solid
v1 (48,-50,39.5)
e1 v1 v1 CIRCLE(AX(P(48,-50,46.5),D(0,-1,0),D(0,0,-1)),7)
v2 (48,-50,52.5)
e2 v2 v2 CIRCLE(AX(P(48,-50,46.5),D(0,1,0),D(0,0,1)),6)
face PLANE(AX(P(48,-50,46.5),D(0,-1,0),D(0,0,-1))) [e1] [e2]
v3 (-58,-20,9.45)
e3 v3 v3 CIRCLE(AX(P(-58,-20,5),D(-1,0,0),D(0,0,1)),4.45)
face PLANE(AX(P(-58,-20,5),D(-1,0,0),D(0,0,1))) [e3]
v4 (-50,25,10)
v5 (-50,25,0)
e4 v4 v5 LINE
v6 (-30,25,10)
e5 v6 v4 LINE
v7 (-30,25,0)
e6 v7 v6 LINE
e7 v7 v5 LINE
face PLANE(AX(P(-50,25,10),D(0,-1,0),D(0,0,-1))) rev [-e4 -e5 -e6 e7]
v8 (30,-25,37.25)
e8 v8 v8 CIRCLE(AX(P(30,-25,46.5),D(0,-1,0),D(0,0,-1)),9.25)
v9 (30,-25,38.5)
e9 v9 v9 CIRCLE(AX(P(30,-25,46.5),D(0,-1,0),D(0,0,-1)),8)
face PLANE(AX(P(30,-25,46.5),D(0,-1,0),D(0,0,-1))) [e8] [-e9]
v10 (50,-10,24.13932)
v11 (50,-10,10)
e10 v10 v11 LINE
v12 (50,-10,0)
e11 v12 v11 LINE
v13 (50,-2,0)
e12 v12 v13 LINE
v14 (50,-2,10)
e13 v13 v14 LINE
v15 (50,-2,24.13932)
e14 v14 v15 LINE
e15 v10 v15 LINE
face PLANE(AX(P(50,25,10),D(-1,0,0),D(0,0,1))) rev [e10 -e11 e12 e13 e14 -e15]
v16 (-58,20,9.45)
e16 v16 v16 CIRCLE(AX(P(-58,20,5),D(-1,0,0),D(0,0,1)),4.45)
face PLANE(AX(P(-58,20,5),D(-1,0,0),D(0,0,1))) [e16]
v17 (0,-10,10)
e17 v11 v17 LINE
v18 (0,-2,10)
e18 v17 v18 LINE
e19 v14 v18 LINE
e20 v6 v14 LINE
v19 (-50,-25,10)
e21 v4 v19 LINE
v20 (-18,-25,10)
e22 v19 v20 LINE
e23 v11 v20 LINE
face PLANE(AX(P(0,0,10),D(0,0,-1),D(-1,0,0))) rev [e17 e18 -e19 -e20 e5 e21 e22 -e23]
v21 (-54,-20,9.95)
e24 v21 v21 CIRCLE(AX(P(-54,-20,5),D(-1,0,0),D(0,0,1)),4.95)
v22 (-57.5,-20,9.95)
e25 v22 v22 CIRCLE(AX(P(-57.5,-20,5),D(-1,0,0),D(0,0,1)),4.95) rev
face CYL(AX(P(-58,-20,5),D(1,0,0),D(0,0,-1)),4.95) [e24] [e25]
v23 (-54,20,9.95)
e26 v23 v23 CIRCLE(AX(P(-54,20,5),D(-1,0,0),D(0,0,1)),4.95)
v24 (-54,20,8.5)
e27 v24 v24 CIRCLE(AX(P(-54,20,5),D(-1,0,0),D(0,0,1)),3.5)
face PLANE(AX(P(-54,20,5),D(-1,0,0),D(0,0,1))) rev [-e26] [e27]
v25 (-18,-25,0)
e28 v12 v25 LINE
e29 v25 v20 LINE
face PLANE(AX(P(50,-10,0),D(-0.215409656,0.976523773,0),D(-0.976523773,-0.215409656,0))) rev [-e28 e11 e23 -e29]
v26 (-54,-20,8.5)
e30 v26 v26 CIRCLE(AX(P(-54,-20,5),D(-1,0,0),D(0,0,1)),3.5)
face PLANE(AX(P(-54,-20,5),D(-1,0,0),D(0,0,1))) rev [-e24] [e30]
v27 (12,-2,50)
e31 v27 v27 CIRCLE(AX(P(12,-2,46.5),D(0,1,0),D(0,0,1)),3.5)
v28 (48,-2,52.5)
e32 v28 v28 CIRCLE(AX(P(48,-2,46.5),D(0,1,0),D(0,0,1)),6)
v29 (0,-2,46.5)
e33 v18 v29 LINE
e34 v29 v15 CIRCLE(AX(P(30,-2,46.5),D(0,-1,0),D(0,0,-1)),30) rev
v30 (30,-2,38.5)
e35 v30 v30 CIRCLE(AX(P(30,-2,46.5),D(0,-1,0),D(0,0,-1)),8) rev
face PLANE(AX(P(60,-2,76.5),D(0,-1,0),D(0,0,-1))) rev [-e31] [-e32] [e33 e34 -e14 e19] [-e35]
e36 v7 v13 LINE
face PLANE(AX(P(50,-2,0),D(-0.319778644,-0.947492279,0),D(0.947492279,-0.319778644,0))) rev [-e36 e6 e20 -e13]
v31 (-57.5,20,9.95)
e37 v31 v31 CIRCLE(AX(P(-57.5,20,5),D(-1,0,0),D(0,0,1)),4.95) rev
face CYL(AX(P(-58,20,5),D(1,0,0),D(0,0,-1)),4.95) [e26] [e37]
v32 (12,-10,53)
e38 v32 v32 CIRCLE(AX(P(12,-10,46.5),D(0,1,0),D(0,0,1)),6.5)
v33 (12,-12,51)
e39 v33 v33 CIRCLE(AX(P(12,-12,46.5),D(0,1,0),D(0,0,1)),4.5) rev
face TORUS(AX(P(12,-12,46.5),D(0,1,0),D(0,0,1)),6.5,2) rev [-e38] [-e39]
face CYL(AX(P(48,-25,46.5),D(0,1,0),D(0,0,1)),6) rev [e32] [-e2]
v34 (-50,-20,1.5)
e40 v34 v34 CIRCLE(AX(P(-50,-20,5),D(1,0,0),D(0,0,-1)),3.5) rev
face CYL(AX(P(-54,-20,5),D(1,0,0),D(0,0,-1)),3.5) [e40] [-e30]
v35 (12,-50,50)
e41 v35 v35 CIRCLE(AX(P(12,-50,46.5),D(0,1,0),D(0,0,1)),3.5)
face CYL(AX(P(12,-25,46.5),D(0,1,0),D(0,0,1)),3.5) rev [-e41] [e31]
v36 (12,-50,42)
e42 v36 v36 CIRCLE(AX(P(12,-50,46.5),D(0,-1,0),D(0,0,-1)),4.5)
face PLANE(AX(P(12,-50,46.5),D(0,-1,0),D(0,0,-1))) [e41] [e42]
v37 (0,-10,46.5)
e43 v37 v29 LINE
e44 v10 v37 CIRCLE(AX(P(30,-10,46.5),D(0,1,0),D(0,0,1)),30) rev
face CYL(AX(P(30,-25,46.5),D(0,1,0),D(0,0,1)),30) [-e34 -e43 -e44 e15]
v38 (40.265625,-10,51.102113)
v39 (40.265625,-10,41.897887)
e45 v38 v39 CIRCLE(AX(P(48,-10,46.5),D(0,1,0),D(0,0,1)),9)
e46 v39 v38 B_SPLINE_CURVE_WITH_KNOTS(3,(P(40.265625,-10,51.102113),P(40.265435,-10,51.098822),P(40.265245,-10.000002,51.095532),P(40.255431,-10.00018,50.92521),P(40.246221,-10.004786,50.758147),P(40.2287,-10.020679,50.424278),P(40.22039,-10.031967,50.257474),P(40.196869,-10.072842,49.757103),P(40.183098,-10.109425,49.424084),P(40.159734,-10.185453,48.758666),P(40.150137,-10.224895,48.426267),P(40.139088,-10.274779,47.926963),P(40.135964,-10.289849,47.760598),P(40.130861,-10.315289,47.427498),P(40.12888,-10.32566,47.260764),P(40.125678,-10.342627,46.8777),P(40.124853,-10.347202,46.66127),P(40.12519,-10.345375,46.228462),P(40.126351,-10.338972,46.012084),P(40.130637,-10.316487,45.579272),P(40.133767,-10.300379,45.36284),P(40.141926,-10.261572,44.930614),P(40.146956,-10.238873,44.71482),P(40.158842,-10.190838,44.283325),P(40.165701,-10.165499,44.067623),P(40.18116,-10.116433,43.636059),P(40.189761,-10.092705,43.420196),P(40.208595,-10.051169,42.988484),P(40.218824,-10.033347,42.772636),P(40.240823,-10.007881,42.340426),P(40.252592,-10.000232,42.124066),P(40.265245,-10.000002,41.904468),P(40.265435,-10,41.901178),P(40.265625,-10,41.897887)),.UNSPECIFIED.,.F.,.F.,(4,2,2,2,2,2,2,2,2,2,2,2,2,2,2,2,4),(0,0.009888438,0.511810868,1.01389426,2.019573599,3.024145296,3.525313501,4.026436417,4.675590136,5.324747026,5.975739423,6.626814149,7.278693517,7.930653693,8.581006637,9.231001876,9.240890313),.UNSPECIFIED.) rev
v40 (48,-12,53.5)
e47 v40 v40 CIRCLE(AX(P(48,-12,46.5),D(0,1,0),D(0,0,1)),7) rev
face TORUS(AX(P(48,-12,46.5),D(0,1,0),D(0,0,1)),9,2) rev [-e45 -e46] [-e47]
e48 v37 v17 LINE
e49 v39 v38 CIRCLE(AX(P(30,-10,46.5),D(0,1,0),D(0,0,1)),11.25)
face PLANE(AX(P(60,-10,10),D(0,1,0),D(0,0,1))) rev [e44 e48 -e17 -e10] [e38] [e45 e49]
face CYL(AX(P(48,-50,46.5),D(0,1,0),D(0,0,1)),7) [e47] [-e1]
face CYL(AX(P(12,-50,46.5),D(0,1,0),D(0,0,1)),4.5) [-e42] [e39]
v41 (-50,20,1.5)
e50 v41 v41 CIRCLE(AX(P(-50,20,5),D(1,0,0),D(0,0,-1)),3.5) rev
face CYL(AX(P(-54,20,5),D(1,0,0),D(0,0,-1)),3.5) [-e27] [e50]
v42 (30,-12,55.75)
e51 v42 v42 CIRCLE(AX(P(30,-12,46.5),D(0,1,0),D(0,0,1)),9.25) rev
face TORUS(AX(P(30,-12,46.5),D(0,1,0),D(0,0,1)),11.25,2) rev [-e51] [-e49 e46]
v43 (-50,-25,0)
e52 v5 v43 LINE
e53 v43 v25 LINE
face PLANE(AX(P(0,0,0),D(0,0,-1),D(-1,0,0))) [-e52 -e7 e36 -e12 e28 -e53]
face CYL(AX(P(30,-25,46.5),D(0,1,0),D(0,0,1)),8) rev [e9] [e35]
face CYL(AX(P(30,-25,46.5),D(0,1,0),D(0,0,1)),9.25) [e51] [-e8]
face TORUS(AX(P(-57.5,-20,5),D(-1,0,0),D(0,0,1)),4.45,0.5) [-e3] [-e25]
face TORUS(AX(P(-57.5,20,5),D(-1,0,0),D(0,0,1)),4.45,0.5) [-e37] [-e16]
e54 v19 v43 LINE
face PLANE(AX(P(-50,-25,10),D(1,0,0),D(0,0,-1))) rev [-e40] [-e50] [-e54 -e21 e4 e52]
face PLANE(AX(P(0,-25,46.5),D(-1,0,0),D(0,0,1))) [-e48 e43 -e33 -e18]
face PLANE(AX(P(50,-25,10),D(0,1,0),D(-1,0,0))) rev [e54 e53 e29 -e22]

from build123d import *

# Parameters (mm, degrees)
SKETCH3_W               = 100
SKETCH3_H               = 50
BOSS_EXTRUDE1_DEPTH     = 10
SKETCH4_R               = 3.5
BOSS_EXTRUDE2_DEPTH     = 4
SKETCH5_R               = 4.95
BOSS_EXTRUDE3_DEPTH     = 4
BOSS_EXTRUDE4_DEPTH     = 50
CUT_EXTRUDE1_DEPTH      = 110.326346321
CUT_EXTRUDE1_DEPTH_BACK = 110.326346321
SKETCH7_R               = 8
CUT_EXTRUDE2_DEPTH      = 101.385506922
CUT_EXTRUDE2_DEPTH_BACK = 101.385506922
SKETCH10_W              = 66.5
SKETCH10_H              = 27
CUT_EXTRUDE3_DEPTH      = 93.990590922
SKETCH12_W              = 66.5
SKETCH12_H              = 15
CUT_EXTRUDE4_DEPTH      = 101.385506922
CUT_EXTRUDE5_DEPTH      = 93.990590922
SKETCH15_R              = 3.5
SKETCH15_R_2            = 6
CUT_EXTRUDE6_DEPTH      = 101.902180353
SKETCH16_R              = 4.5
SKETCH16_R_2            = 7
BOSS_EXTRUDE5_DEPTH     = 40
SKETCH17_R              = 6
SKETCH17_R_2            = 3.5
CUT_EXTRUDE7_DEPTH      = 106.129681822
SKETCH18_R              = 9.25
BOSS_EXTRUDE6_DEPTH     = 15
SKETCH19_R              = 8
CUT_EXTRUDE8_DEPTH      = 110.326346321
FILLET3_R               = 2
FILLET4_R               = 0.5


with BuildPart() as part:
    # Sketch3 → Boss-Extrude1 (new body)
    with BuildSketch(Plane.XY):
        Rectangle(SKETCH3_W, SKETCH3_H)
    extrude(amount=BOSS_EXTRUDE1_DEPTH)

    # Sketch4 → Boss-Extrude2 (add)
    with BuildSketch(Plane.ZY.offset(50)):
        with Locations(Location((5, 20, 0), (0, 0, 180))):
            Circle(SKETCH4_R)
        with Locations(Location((5, -20, 0), (0, 0, 180))):
            Circle(SKETCH4_R)
    extrude(amount=BOSS_EXTRUDE2_DEPTH)

    # Sketch5 → Boss-Extrude3 (add)
    with BuildSketch(Plane.ZY.offset(54)):
        with Locations((5, 20)):
            Circle(SKETCH5_R)
        with Locations((5, -20)):
            Circle(SKETCH5_R)
    extrude(amount=BOSS_EXTRUDE3_DEPTH)

    # Sketch6 → Boss-Extrude4 (add)
    with BuildSketch(Plane(origin=(0, 25, 0), x_dir=(1, 0, 0), z_dir=(0, 1, 0))):
        with BuildLine():
            Line((0, -46.5), (0, -10))
            Line((0, -10), (50, -10))
            Line((50, -10), (50, -24.139320225))
            ThreePointArc((50, -24.139320225), (42.247448714, -73.886127875), (0, -46.5))
        make_face()
    extrude(amount=-BOSS_EXTRUDE4_DEPTH)

    # Sketch7 → Cut-Extrude1 (cut, two sides: drawn at the far end of the back side and taken through both)
    with BuildSketch(Plane(origin=(0, 25, 0), x_dir=(1, 0, 0), z_dir=(0, 1, 0)).offset(-CUT_EXTRUDE1_DEPTH_BACK)):
        with Locations(Location((30, -46.5, 0), (0, 0, 270))):
            Circle(SKETCH7_R)
    extrude(amount=CUT_EXTRUDE1_DEPTH + CUT_EXTRUDE1_DEPTH_BACK, mode=Mode.SUBTRACT)

    # Sketch10 → Cut-Extrude2 (cut, two sides: drawn at the far end of the back side and taken through both)
    with BuildSketch(Plane.ZY.offset(-CUT_EXTRUDE2_DEPTH_BACK)):
        with Locations((43.25, 11.5)):
            Rectangle(SKETCH10_W, SKETCH10_H)
    extrude(amount=CUT_EXTRUDE2_DEPTH + CUT_EXTRUDE2_DEPTH_BACK, mode=Mode.SUBTRACT)

    # Sketch11 → Cut-Extrude3 (cut, through all)
    with BuildSketch(Plane.XY.offset(10)):
        Polygon((50, -2), (-30, 25), (50, 25), align=None)
    extrude(amount=-CUT_EXTRUDE3_DEPTH, mode=Mode.SUBTRACT)

    # Sketch12 → Cut-Extrude4 (cut, through all)
    with BuildSketch(Plane.ZY):
        with Locations((43.25, -17.5)):
            Rectangle(SKETCH12_W, SKETCH12_H)
    extrude(amount=-CUT_EXTRUDE4_DEPTH, mode=Mode.SUBTRACT)

    # Sketch13 → Cut-Extrude5 (cut, through all)
    with BuildSketch(Plane.XY.offset(10)):
        Polygon((50, -10), (-18, -25), (50, -25), align=None)
    extrude(amount=-CUT_EXTRUDE5_DEPTH, mode=Mode.SUBTRACT)

    # Sketch15 → Cut-Extrude6 (cut, through all)
    with BuildSketch(Plane(origin=(0, -2, 0), x_dir=(1, 0, 0), z_dir=(0, 1, 0))):
        with Locations(Location((12, -46.5, 0), (0, 0, 270))):
            Circle(SKETCH15_R)
        with Locations(Location((48, -46.5, 0), (0, 0, 270))):
            Circle(SKETCH15_R_2)
    extrude(amount=-CUT_EXTRUDE6_DEPTH, mode=Mode.SUBTRACT)

    # Sketch16 → Boss-Extrude5 (add)
    with BuildSketch(Plane(origin=(0, -10, 0), x_dir=(-1, 0, 0), z_dir=(0, -1, 0))):
        with Locations(Location((-12, -46.5, 0), (0, 0, 270))):
            Circle(SKETCH16_R)
        with Locations(Location((-48, -46.5, 0), (0, 0, 270))):
            Circle(SKETCH16_R_2)
    extrude(amount=BOSS_EXTRUDE5_DEPTH)

    # Sketch17 → Cut-Extrude7 (cut, through all)
    with BuildSketch(Plane(origin=(0, -10, 0), x_dir=(1, 0, 0), z_dir=(0, 1, 0))):
        with Locations(Location((48, -46.5, 0), (0, 0, 270))):
            Circle(SKETCH17_R)
        with Locations(Location((12, -46.5, 0), (0, 0, 270))):
            Circle(SKETCH17_R_2)
    extrude(amount=-CUT_EXTRUDE7_DEPTH, mode=Mode.SUBTRACT)

    # Sketch18 → Boss-Extrude6 (add)
    with BuildSketch(Plane.XZ.offset(10)):
        with Locations(Location((30, 46.5, 0), (0, 0, 90))):
            Circle(SKETCH18_R)
    extrude(amount=BOSS_EXTRUDE6_DEPTH)

    # Sketch19 → Cut-Extrude8 (cut, through all)
    with BuildSketch(Plane.XZ.offset(25)):
        with Locations(Location((30, 46.5, 0), (0, 0, 270))):
            Circle(SKETCH19_R)
    extrude(amount=-CUT_EXTRUDE8_DEPTH, mode=Mode.SUBTRACT)

    # Fillet3
    # the kernel refuses this fillet: 2 mm, written as the material it adds along each edge
    with BuildSketch(Plane(origin=(48, -10, 46.5), x_dir=(0, 0, 1), z_dir=(1, 0, 0))) as fillet3_piece_1:
        with BuildLine():
            CenterArc((7 + FILLET3_R, FILLET3_R), FILLET3_R, 180, 90)
            Line((7 + FILLET3_R, 0), (7, 0))
            Line((7, 0), (7, FILLET3_R))
        make_face()
    revolve(axis=Axis((48, -10, 46.5), (0, -1, 0)))
    with BuildSketch(Plane(origin=(12, -10, 46.5), x_dir=(0, 0, 1), z_dir=(1, 0, 0))) as fillet3_piece_2:
        with BuildLine():
            CenterArc((4.5 + FILLET3_R, FILLET3_R), FILLET3_R, 180, 90)
            Line((4.5 + FILLET3_R, 0), (4.5, 0))
            Line((4.5, 0), (4.5, FILLET3_R))
        make_face()
    revolve(axis=Axis((12, -10, 46.5), (0, -1, 0)))
    with BuildSketch(Plane(origin=(30, -10, 46.5), x_dir=(0, 0, 1), z_dir=(1, 0, 0))) as fillet3_piece_3:
        with BuildLine():
            CenterArc((9.25 + FILLET3_R, FILLET3_R), FILLET3_R, 180, 90)
            Line((9.25 + FILLET3_R, 0), (9.25, 0))
            Line((9.25, 0), (9.25, FILLET3_R))
        make_face()
    revolve(axis=Axis((30, -10, 46.5), (0, -1, 0)))

    # Fillet4
    fillet4_edges = [part.edges().sort_by_distance(p)[0] for p in [
        (-58, 20, 0.05),
        (-58, -20, 0.05),
    ]]
    fillet(fillet4_edges, radius=FILLET4_R)


solid = part.part
